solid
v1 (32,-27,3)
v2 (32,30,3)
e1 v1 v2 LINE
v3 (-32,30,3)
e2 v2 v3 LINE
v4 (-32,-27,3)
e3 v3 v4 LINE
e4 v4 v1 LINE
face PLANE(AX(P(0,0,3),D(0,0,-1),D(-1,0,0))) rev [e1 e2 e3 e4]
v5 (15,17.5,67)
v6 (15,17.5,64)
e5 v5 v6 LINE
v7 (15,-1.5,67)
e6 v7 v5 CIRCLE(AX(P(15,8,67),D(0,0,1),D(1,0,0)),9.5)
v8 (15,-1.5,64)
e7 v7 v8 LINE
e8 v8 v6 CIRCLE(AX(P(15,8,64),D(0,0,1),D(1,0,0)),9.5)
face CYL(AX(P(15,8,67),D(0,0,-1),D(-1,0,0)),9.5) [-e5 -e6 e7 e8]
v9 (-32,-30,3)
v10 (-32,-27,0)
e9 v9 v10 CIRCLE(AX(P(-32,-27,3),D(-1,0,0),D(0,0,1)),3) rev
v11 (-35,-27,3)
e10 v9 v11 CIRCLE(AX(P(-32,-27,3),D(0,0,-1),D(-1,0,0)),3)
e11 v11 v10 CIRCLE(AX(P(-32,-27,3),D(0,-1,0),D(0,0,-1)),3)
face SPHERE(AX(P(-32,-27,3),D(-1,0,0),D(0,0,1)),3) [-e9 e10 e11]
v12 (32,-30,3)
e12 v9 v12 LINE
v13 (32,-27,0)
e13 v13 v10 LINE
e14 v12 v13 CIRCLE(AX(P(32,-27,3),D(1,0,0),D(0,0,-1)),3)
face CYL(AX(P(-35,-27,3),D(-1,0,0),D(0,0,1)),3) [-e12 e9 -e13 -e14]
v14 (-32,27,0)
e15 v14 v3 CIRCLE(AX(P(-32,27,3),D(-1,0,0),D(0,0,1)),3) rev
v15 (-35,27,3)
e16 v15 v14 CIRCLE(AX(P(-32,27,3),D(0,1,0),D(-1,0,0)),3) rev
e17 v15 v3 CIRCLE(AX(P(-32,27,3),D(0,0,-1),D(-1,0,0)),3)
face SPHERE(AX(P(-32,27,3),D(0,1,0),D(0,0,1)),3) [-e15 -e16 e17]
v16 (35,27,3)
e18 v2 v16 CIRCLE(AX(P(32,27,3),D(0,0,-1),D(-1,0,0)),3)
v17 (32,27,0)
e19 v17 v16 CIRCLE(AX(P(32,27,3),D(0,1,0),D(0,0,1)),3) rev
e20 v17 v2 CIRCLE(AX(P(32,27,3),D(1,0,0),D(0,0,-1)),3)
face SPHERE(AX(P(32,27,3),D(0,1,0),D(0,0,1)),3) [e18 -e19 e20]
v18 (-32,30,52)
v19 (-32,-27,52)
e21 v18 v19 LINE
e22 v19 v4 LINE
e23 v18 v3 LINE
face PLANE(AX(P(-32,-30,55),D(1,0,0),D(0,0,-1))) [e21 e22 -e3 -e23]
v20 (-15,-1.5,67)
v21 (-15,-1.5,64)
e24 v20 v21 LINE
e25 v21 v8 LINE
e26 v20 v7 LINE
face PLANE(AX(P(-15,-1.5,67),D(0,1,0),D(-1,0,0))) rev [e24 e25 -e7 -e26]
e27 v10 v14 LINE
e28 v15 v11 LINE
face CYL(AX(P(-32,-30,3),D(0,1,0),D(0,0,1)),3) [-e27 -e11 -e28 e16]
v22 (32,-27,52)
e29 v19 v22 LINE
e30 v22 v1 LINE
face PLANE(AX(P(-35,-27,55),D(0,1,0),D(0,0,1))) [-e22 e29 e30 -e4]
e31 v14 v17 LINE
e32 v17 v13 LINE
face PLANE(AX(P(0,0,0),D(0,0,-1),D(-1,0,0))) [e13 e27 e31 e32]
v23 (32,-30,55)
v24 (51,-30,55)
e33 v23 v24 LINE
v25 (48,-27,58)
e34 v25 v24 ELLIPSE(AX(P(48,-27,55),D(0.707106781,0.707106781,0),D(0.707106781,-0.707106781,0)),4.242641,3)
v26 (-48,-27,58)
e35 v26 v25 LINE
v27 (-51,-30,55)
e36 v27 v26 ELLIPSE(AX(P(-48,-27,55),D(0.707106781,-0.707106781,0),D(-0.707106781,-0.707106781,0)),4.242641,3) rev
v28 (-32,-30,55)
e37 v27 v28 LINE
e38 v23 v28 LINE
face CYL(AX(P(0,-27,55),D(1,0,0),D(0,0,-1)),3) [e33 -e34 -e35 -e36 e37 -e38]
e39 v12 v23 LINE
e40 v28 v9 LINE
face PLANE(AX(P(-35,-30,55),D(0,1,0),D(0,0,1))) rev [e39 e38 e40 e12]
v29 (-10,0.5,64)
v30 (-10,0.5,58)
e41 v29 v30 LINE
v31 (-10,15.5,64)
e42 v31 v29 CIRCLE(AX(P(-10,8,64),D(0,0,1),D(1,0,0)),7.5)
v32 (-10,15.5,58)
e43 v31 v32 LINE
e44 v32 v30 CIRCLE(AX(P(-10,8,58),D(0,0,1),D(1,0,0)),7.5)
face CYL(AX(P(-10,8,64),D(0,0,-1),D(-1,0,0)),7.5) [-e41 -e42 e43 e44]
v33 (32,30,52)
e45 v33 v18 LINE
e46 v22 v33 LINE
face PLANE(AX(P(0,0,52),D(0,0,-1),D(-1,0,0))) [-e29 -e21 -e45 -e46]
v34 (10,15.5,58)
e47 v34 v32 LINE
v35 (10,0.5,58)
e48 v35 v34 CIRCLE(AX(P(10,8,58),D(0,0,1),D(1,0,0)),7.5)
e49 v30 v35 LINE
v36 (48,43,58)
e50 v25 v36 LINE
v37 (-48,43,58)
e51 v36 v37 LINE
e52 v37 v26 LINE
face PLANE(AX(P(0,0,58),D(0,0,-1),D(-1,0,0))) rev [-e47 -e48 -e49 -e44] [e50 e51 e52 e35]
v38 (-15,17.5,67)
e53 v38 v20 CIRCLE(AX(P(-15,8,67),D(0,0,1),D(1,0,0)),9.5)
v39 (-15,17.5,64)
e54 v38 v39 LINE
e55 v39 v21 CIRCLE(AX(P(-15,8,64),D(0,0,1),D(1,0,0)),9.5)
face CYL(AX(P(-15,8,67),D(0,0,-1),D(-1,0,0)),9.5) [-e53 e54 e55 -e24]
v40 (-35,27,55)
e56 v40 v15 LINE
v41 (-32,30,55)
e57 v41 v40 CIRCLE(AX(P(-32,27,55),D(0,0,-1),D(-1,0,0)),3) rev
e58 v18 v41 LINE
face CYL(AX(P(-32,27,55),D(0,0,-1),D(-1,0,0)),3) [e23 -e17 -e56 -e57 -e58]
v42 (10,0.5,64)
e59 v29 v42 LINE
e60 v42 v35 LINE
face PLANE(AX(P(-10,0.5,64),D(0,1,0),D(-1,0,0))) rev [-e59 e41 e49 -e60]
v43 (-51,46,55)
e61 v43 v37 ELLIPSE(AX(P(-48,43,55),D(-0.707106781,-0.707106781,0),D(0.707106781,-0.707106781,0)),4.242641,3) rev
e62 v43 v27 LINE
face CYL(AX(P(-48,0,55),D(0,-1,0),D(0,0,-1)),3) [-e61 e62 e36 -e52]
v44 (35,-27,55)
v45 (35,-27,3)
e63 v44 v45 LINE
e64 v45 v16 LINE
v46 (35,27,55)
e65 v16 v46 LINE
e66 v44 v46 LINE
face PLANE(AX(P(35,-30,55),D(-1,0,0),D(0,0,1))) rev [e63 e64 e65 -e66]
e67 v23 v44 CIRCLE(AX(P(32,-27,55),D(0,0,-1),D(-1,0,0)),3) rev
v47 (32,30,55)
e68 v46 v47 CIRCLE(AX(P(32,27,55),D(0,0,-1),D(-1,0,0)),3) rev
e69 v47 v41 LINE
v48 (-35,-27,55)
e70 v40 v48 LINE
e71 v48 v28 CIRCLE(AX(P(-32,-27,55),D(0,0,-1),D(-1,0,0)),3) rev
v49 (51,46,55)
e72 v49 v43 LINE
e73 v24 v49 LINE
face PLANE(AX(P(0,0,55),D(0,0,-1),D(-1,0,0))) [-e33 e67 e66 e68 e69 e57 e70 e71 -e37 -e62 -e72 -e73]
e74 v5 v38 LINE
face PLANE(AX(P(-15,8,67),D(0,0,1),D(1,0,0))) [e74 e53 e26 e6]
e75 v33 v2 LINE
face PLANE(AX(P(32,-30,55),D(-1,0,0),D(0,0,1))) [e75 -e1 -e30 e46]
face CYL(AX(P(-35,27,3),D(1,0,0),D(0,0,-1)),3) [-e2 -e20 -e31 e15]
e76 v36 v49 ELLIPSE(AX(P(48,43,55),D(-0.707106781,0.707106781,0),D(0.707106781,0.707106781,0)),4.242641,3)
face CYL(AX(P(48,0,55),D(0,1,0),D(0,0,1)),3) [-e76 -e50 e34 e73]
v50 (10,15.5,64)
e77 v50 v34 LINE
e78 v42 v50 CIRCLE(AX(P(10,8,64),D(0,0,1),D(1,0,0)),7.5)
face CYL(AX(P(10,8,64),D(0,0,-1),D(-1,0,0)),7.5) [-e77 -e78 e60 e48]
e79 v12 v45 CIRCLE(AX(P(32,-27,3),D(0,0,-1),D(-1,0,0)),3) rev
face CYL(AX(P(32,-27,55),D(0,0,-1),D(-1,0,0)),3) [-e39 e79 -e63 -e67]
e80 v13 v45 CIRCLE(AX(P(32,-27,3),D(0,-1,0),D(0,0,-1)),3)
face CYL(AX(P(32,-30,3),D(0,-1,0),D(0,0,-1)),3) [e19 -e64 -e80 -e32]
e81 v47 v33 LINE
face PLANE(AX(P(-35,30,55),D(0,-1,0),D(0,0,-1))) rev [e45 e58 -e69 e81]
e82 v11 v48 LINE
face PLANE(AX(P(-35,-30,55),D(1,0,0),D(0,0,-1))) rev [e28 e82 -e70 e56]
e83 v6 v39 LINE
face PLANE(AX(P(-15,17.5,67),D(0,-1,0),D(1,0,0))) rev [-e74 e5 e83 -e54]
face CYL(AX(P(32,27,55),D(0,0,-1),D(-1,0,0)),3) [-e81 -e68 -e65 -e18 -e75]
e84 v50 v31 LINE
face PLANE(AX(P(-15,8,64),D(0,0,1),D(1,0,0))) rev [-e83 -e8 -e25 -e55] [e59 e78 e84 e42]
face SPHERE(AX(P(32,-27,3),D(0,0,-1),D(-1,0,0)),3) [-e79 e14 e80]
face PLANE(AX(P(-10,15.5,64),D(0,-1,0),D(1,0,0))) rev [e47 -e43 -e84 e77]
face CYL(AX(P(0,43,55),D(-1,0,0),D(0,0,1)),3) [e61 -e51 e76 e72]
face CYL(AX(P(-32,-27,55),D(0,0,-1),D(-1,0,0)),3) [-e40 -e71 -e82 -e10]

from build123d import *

# Parameters (mm, degrees)
SKETCH_1_W      = 70
SKETCH_1_H      = 60
EXTRUDE_1_DEPTH = 55
SHELL_1_T       = -3
SKETCH_2_W      = 102
SKETCH_2_H      = 76
EXTRUDE_2_DEPTH = 3
FILLET_1_R      = 3
FILLET_4_R      = 3
EXTRUDE_3_DEPTH = 6
EXTRUDE_4_DEPTH = 3


with BuildPart() as part:
    # 草图1 → 凸台-拉伸1 (new body)
    with BuildSketch(Plane.XY):
        Rectangle(SKETCH_1_W, SKETCH_1_H)
    extrude(amount=EXTRUDE_1_DEPTH)

    # 抽壳1
    shell_1_openings = [part.faces().sort_by_distance(p)[0] for p in [
        (0, 30, 27.5),
    ]]
    offset(amount=SHELL_1_T, openings=shell_1_openings, kind=Kind.INTERSECTION)

    # 草图2 → 凸台-拉伸2 (add)
    with BuildSketch(Plane.XY.offset(55)):
        with Locations((0, 8)):
            Rectangle(SKETCH_2_W, SKETCH_2_H)
    extrude(amount=EXTRUDE_2_DEPTH)

    # 圆角1
    fillet_1_edges = [part.edges().sort_by_distance(p)[0] for p in [
        (0, 46, 58),
        (51, 8, 58),
        (0, -30, 58),
        (-51, 8, 58),
    ]]
    fillet(fillet_1_edges, radius=FILLET_1_R - 0.0001)  # a hair under: the kernel refuses the full size

    # 圆角4
    fillet_4_edges = [part.edges().sort_by_distance(p)[0] for p in [
        (0, -30, 0),
        (-35, 0, 0),
        (0, 30, 0),
        (35, 0, 0),
        (35, -30, 27.5),
        (-35, -30, 27.5),
        (-35, 30, 27.5),
        (35, 30, 27.5),
    ]]
    fillet(fillet_4_edges, radius=FILLET_4_R - 0.0001)  # a hair under: the kernel refuses the full size

    # 草图3 → 凸台-拉伸3 (add)
    with BuildSketch(Plane.XY.offset(58)):
        with BuildLine():
            Line((-10, 15.5), (10, 15.5))
            ThreePointArc((10, 15.5), (17.5, 8), (10, 0.5))
            Line((10, 0.5), (-10, 0.5))
            ThreePointArc((-10, 0.5), (-17.5, 8), (-10, 15.5))
        make_face()
    extrude(amount=EXTRUDE_3_DEPTH)

    # 草图4 → 凸台-拉伸4 (add)
    with BuildSketch(Plane.XY.offset(64)):
        with BuildLine():
            Line((-15, 17.5), (15, 17.5))
            ThreePointArc((15, 17.5), (24.5, 8), (15, -1.5))
            Line((15, -1.5), (-15, -1.5))
            ThreePointArc((-15, -1.5), (-24.5, 8), (-15, 17.5))
        make_face()
    extrude(amount=EXTRUDE_4_DEPTH)


solid = part.part
